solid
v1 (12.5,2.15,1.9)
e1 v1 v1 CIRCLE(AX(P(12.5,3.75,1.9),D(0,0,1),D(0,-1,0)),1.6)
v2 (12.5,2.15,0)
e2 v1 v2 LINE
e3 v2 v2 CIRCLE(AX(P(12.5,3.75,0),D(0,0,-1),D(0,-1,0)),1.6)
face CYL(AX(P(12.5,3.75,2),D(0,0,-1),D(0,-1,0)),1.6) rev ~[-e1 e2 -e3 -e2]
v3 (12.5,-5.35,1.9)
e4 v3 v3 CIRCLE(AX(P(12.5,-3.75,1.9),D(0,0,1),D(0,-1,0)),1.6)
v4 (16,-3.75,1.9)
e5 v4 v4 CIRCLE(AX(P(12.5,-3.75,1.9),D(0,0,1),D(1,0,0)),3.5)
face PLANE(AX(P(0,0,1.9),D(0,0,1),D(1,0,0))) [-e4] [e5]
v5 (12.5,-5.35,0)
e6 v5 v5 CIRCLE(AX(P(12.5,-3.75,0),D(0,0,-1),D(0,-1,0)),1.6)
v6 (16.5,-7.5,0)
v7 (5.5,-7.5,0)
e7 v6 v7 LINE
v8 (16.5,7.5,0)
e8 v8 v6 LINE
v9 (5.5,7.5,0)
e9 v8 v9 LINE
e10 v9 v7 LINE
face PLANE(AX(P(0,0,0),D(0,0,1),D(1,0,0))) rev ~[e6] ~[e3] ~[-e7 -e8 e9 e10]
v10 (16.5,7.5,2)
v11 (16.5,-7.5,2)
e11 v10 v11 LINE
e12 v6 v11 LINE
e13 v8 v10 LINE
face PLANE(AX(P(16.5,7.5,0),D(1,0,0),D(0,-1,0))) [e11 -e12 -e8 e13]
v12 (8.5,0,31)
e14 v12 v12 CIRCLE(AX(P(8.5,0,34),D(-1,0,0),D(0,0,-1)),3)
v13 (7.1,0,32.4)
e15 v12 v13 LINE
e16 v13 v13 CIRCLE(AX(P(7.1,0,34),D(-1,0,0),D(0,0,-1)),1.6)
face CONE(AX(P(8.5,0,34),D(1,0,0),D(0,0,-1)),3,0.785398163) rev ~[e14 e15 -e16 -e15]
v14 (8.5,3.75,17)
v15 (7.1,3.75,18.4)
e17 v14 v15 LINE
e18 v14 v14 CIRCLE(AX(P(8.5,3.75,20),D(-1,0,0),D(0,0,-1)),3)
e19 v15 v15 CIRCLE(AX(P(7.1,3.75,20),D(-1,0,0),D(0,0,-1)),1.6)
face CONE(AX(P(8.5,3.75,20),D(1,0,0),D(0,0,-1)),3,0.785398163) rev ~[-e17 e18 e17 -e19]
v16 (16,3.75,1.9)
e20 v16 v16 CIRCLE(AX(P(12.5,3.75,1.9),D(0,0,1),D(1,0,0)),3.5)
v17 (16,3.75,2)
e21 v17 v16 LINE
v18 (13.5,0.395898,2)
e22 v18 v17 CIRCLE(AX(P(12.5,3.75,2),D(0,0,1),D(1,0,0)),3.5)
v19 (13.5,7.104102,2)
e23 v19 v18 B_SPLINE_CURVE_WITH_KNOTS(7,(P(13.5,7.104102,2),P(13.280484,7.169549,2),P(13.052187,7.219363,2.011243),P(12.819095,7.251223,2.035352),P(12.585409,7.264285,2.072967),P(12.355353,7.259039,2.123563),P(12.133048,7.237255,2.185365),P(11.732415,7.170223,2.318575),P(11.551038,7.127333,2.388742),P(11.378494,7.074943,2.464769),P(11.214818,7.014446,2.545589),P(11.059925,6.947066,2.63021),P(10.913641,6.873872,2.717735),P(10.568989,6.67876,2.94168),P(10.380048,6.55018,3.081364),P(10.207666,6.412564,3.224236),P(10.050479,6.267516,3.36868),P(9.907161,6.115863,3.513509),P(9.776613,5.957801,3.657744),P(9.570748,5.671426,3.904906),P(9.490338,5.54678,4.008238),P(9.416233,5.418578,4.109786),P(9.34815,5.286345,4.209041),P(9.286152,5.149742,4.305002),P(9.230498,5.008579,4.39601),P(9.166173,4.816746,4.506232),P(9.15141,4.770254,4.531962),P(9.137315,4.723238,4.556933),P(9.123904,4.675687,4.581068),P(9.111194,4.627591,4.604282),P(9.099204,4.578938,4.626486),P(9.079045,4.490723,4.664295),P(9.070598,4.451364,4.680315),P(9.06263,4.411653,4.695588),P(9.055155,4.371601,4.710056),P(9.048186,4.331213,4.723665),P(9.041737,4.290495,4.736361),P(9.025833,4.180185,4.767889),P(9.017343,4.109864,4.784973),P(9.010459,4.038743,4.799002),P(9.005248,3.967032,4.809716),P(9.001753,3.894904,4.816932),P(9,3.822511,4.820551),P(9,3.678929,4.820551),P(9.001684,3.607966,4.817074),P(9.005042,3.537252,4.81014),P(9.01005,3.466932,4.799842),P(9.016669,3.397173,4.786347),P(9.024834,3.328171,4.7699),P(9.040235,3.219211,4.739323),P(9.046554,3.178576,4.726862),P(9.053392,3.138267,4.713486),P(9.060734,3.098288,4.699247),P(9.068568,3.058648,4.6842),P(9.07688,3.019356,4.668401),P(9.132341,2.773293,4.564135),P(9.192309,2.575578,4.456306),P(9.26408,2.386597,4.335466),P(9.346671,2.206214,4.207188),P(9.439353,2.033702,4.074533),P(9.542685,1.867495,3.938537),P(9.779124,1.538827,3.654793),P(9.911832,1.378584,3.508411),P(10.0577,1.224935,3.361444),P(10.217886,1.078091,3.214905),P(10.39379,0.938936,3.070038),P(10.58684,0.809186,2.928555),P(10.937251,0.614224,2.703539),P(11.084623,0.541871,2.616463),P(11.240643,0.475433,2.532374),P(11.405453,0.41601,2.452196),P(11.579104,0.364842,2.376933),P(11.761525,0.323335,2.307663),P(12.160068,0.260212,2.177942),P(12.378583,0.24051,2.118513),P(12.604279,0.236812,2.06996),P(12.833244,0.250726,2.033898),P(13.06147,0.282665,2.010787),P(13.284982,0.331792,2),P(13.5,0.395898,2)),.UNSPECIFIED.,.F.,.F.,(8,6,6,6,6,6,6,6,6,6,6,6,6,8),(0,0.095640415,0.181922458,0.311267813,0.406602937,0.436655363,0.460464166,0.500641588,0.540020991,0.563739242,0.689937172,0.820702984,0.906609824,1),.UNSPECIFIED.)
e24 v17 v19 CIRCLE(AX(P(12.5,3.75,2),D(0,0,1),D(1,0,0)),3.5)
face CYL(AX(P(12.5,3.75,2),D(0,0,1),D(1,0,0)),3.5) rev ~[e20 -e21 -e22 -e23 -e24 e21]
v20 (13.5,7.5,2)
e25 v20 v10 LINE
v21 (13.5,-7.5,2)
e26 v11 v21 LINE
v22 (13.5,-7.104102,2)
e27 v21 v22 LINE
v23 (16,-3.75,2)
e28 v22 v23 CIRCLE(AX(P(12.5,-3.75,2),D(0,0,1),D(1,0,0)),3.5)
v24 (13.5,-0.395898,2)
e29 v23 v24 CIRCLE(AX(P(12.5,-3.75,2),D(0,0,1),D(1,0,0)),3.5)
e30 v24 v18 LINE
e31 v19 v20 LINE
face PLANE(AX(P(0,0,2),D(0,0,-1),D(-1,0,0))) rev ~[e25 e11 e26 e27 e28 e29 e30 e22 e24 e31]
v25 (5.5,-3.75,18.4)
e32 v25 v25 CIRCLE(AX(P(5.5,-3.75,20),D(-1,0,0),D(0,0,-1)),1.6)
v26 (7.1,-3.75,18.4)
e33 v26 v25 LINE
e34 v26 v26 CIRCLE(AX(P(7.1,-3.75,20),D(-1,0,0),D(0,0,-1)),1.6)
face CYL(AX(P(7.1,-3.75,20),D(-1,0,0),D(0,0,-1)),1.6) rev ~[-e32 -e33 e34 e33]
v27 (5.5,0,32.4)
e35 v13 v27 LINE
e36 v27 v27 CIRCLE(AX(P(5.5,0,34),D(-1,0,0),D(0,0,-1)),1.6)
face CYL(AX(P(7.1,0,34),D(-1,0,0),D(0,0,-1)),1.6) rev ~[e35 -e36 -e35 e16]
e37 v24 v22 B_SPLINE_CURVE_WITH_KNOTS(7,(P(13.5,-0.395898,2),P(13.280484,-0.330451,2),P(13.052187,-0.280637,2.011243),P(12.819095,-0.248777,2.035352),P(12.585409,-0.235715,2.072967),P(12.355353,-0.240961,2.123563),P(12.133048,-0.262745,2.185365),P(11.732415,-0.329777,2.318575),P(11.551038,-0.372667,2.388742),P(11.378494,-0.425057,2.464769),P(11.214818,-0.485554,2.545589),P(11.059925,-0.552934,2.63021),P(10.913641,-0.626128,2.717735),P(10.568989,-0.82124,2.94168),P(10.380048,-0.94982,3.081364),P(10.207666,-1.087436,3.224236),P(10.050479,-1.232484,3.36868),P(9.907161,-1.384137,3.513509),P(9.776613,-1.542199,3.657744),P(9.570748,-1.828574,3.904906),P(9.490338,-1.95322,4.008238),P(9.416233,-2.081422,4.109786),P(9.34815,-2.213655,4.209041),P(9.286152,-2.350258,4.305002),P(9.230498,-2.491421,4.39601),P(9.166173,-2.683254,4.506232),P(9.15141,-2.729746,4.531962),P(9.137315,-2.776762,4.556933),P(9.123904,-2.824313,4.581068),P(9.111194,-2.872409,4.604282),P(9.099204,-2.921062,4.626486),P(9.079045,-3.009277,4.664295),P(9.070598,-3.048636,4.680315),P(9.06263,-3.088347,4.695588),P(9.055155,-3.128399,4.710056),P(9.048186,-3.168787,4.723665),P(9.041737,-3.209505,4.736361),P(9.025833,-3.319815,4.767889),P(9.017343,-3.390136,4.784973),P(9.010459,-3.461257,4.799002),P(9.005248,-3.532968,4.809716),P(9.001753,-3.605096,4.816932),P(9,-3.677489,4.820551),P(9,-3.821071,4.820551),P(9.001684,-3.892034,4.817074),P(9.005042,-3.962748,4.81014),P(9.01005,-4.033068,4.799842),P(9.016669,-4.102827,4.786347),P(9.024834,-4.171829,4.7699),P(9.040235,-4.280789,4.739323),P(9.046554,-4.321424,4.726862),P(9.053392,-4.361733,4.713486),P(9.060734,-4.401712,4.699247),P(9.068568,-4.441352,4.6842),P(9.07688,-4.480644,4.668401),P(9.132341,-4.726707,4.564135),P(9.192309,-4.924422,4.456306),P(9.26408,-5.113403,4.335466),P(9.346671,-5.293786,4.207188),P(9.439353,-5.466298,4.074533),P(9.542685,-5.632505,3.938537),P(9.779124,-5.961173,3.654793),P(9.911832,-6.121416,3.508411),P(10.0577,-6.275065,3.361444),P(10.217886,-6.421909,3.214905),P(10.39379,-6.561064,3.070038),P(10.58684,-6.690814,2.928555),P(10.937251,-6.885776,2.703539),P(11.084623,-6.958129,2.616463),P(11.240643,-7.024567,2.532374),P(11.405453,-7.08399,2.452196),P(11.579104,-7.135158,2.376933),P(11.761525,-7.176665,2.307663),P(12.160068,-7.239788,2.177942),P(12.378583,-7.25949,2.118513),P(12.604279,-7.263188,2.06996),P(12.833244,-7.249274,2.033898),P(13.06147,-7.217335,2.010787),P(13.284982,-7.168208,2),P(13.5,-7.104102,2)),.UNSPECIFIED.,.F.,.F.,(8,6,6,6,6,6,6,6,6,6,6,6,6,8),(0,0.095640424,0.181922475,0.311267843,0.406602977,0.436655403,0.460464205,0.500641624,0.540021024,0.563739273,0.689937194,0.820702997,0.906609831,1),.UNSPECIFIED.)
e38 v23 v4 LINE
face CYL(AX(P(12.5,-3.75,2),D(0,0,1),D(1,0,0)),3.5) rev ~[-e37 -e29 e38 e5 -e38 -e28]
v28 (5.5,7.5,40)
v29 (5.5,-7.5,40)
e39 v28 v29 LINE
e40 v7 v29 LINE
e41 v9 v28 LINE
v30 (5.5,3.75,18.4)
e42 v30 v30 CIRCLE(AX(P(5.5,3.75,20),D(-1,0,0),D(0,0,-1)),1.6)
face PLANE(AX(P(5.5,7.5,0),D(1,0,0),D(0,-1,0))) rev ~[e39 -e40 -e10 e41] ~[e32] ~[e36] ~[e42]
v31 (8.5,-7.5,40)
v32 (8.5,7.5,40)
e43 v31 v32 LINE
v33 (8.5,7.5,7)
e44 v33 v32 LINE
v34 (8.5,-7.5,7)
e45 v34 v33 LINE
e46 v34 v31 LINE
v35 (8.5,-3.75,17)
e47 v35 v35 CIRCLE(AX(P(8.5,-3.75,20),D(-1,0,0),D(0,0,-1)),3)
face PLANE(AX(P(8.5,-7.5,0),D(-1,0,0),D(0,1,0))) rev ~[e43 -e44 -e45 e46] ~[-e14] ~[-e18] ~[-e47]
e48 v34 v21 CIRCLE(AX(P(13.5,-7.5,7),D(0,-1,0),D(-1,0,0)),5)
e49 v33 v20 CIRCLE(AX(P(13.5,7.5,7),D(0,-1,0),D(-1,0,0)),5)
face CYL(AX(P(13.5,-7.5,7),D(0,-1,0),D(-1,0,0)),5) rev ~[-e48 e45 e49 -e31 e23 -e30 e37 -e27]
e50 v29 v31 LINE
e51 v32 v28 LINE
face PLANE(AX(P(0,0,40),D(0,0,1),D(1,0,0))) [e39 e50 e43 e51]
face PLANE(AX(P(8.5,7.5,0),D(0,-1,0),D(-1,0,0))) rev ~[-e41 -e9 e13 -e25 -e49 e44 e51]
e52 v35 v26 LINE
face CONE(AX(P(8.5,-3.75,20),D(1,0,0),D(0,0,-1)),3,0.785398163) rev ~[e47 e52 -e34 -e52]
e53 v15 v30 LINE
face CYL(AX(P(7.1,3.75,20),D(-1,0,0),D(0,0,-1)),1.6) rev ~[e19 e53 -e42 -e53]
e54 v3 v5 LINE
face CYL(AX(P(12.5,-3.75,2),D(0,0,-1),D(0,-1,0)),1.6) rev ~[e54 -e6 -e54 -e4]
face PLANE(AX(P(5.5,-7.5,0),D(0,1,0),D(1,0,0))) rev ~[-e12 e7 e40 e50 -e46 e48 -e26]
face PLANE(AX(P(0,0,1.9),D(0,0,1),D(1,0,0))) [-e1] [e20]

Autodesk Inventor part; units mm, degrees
ref_plane "YZ Plane" through (0, 0, 0) normal (1, 0, 0) x (0, 1, 0)
ref_plane "XZ Plane" through (0, 0, 0) normal (0, 1, 0) x (-1, 0, 0)
ref_plane "XY Plane" through (0, 0, 0) normal (0, 0, 1) x (1, 0, 0)
ref_plane "Work Plane1" through (0, 0, 0) normal (0, 0, 1) x (1, 0, 0)
sketch "Sketch1" plane through (0, 0, 0) normal (0, 0, 1) x (1, 0, 0)
  circle A0 centre (0, 0) radius 20 construction
  circle A1 centre (10.45, 12.5) radius 1.75 construction
  circle A2 centre (10.45, -12.5) radius 1.75 construction
  circle A3 centre (-10.45, 12.5) radius 1.75 construction
  circle A4 centre (-10.45, -12.5) radius 1.75 construction
  line L0 (-6.5984, 12.21) -> (-6.5984, 15.25) construction
  line L1 (-6.5984, 15.25) -> (6.6016, 15.25) construction
  line L2 (6.6016, 15.25) -> (6.6016, 12.21) construction
  line L3 (6.6016, 12.21) -> (-6.5984, 12.21) construction
  line L4 (6.6016, -12.21) -> (6.6016, -15.25) construction
  line L5 (6.6016, -15.25) -> (-6.5984, -15.25) construction
  line L6 (-6.5984, -15.25) -> (-6.5984, -12.21) construction
  line L7 (-6.5984, -12.21) -> (6.6016, -12.21) construction
  line L8 (5.5, 7.5) -> (5.5, -7.5)
  line L9 (5.5, -7.5) -> (8.5, -7.5)
  line L10 (8.5, -7.5) -> (8.5, 7.5)
  line L11 (8.5, 7.5) -> (5.5, 7.5)
  line L12 (5.5, 7.5) -> (8.5, -7.5) construction
  line L13 (5.5, -7.5) -> (8.5, 7.5) construction
  line L14 (0, 0) -> (7, 0) construction
  point P0 (0, 0)
  dimension "d0" = 7
  dimension "d1" = 3
  dimension "d2" = 15
extrude "Extrusion1" add sketch "Sketch1" along normal blind 40
sketch "Sketch2" plane through (0, 0, 0) normal (0, 0, -1) x (-1, 0, 0)
  line L0 (-5.5, -7.5) -> (-8.5, -7.5) projected
  line L1 (-8.5, 7.5) -> (-5.5, 7.5) projected
  line L2 (-8.5, -7.5) -> (-8.5, 7.5)
  line L3 (-8.5, 7.5) -> (-16.5, 7.5)
  line L4 (-16.5, 7.5) -> (-16.5, -7.5)
  line L5 (-16.5, -7.5) -> (-8.5, -7.5)
  point P0 (0, 0)
  dimension "d5" = 8
extrude "Extrusion2" add sketch "Sketch2" against normal blind 2
sketch "Sketch3" plane through (0, 0, 2) normal (0, 0, 1) x (1, 0, 0)
  line L0 (16.5, -7.5) -> (16.5, 7.5) construction
  line L1 (16.5, 7.5) -> (8.5, 7.5) construction
  line L2 (8.5, -7.5) -> (8.5, 7.5) construction
  line L3 (8.5, -7.5) -> (16.5, -7.5) construction
  point P0 (0, 0)
  point P1 (12.5, 3.75)
  point P2 (12.5, -3.75)
  dimension "d9" = 3.75
  dimension "d10" = 4
  dimension "d11" = 3.75
  dimension "d12" = 4
hole "Hole1" at (12.5, 3.75, 2) at (12.5, -3.75, 2) direction (0, 0, -1) diameter 3.2 end through all
sketch "Sketch4" plane through (8.5, -7.5, 40) normal (1, 0, 0) x (0, 0, -1)
  line L0 (0, 0) -> (0, 15) projected
  line L1 (38, 0) -> (0, 0) projected
  line L2 (38, 15) -> (0, 15) projected
  point P0 (40, 7.5)
  point P1 (6, 7.5)
  point P2 (20, 3.75)
  point P3 (20, 11.25)
  dimension "d20" = 20
  dimension "d21" = 20
  dimension "d22" = 3.75
  dimension "d23" = 3.75
  dimension "d24" = 7.5
  dimension "d25" = 6
hole "Hole2" at (8.5, 0, 34) at (8.5, -3.75, 20) at (8.5, 3.75, 20) direction (-1, 0, 0) diameter 3.2 end through all countersink diameter 6 countersink angle 90
sketch "Sketch5" plane through (0, 0, 2) normal (0, 0, 1) x (1, 0, 0)
  circle A0 centre (12.5, 3.75) radius 1.6 projected
  circle A1 centre (12.5, -3.75) radius 1.6 projected
  circle A2 centre (12.5, 3.75) radius 3.5
  circle A3 centre (12.5, -3.75) radius 3.5
  point P0 (0, 0)
  dimension "d37" = 7
  dimension "d38" = 7
extrude "Extrusion3" cut sketch "Sketch5" against normal blind 0.1
fillet "Fillet2" radius 5 1 edges at (8.5, 0, 2)
properties part number "colorSensorHolder2"
